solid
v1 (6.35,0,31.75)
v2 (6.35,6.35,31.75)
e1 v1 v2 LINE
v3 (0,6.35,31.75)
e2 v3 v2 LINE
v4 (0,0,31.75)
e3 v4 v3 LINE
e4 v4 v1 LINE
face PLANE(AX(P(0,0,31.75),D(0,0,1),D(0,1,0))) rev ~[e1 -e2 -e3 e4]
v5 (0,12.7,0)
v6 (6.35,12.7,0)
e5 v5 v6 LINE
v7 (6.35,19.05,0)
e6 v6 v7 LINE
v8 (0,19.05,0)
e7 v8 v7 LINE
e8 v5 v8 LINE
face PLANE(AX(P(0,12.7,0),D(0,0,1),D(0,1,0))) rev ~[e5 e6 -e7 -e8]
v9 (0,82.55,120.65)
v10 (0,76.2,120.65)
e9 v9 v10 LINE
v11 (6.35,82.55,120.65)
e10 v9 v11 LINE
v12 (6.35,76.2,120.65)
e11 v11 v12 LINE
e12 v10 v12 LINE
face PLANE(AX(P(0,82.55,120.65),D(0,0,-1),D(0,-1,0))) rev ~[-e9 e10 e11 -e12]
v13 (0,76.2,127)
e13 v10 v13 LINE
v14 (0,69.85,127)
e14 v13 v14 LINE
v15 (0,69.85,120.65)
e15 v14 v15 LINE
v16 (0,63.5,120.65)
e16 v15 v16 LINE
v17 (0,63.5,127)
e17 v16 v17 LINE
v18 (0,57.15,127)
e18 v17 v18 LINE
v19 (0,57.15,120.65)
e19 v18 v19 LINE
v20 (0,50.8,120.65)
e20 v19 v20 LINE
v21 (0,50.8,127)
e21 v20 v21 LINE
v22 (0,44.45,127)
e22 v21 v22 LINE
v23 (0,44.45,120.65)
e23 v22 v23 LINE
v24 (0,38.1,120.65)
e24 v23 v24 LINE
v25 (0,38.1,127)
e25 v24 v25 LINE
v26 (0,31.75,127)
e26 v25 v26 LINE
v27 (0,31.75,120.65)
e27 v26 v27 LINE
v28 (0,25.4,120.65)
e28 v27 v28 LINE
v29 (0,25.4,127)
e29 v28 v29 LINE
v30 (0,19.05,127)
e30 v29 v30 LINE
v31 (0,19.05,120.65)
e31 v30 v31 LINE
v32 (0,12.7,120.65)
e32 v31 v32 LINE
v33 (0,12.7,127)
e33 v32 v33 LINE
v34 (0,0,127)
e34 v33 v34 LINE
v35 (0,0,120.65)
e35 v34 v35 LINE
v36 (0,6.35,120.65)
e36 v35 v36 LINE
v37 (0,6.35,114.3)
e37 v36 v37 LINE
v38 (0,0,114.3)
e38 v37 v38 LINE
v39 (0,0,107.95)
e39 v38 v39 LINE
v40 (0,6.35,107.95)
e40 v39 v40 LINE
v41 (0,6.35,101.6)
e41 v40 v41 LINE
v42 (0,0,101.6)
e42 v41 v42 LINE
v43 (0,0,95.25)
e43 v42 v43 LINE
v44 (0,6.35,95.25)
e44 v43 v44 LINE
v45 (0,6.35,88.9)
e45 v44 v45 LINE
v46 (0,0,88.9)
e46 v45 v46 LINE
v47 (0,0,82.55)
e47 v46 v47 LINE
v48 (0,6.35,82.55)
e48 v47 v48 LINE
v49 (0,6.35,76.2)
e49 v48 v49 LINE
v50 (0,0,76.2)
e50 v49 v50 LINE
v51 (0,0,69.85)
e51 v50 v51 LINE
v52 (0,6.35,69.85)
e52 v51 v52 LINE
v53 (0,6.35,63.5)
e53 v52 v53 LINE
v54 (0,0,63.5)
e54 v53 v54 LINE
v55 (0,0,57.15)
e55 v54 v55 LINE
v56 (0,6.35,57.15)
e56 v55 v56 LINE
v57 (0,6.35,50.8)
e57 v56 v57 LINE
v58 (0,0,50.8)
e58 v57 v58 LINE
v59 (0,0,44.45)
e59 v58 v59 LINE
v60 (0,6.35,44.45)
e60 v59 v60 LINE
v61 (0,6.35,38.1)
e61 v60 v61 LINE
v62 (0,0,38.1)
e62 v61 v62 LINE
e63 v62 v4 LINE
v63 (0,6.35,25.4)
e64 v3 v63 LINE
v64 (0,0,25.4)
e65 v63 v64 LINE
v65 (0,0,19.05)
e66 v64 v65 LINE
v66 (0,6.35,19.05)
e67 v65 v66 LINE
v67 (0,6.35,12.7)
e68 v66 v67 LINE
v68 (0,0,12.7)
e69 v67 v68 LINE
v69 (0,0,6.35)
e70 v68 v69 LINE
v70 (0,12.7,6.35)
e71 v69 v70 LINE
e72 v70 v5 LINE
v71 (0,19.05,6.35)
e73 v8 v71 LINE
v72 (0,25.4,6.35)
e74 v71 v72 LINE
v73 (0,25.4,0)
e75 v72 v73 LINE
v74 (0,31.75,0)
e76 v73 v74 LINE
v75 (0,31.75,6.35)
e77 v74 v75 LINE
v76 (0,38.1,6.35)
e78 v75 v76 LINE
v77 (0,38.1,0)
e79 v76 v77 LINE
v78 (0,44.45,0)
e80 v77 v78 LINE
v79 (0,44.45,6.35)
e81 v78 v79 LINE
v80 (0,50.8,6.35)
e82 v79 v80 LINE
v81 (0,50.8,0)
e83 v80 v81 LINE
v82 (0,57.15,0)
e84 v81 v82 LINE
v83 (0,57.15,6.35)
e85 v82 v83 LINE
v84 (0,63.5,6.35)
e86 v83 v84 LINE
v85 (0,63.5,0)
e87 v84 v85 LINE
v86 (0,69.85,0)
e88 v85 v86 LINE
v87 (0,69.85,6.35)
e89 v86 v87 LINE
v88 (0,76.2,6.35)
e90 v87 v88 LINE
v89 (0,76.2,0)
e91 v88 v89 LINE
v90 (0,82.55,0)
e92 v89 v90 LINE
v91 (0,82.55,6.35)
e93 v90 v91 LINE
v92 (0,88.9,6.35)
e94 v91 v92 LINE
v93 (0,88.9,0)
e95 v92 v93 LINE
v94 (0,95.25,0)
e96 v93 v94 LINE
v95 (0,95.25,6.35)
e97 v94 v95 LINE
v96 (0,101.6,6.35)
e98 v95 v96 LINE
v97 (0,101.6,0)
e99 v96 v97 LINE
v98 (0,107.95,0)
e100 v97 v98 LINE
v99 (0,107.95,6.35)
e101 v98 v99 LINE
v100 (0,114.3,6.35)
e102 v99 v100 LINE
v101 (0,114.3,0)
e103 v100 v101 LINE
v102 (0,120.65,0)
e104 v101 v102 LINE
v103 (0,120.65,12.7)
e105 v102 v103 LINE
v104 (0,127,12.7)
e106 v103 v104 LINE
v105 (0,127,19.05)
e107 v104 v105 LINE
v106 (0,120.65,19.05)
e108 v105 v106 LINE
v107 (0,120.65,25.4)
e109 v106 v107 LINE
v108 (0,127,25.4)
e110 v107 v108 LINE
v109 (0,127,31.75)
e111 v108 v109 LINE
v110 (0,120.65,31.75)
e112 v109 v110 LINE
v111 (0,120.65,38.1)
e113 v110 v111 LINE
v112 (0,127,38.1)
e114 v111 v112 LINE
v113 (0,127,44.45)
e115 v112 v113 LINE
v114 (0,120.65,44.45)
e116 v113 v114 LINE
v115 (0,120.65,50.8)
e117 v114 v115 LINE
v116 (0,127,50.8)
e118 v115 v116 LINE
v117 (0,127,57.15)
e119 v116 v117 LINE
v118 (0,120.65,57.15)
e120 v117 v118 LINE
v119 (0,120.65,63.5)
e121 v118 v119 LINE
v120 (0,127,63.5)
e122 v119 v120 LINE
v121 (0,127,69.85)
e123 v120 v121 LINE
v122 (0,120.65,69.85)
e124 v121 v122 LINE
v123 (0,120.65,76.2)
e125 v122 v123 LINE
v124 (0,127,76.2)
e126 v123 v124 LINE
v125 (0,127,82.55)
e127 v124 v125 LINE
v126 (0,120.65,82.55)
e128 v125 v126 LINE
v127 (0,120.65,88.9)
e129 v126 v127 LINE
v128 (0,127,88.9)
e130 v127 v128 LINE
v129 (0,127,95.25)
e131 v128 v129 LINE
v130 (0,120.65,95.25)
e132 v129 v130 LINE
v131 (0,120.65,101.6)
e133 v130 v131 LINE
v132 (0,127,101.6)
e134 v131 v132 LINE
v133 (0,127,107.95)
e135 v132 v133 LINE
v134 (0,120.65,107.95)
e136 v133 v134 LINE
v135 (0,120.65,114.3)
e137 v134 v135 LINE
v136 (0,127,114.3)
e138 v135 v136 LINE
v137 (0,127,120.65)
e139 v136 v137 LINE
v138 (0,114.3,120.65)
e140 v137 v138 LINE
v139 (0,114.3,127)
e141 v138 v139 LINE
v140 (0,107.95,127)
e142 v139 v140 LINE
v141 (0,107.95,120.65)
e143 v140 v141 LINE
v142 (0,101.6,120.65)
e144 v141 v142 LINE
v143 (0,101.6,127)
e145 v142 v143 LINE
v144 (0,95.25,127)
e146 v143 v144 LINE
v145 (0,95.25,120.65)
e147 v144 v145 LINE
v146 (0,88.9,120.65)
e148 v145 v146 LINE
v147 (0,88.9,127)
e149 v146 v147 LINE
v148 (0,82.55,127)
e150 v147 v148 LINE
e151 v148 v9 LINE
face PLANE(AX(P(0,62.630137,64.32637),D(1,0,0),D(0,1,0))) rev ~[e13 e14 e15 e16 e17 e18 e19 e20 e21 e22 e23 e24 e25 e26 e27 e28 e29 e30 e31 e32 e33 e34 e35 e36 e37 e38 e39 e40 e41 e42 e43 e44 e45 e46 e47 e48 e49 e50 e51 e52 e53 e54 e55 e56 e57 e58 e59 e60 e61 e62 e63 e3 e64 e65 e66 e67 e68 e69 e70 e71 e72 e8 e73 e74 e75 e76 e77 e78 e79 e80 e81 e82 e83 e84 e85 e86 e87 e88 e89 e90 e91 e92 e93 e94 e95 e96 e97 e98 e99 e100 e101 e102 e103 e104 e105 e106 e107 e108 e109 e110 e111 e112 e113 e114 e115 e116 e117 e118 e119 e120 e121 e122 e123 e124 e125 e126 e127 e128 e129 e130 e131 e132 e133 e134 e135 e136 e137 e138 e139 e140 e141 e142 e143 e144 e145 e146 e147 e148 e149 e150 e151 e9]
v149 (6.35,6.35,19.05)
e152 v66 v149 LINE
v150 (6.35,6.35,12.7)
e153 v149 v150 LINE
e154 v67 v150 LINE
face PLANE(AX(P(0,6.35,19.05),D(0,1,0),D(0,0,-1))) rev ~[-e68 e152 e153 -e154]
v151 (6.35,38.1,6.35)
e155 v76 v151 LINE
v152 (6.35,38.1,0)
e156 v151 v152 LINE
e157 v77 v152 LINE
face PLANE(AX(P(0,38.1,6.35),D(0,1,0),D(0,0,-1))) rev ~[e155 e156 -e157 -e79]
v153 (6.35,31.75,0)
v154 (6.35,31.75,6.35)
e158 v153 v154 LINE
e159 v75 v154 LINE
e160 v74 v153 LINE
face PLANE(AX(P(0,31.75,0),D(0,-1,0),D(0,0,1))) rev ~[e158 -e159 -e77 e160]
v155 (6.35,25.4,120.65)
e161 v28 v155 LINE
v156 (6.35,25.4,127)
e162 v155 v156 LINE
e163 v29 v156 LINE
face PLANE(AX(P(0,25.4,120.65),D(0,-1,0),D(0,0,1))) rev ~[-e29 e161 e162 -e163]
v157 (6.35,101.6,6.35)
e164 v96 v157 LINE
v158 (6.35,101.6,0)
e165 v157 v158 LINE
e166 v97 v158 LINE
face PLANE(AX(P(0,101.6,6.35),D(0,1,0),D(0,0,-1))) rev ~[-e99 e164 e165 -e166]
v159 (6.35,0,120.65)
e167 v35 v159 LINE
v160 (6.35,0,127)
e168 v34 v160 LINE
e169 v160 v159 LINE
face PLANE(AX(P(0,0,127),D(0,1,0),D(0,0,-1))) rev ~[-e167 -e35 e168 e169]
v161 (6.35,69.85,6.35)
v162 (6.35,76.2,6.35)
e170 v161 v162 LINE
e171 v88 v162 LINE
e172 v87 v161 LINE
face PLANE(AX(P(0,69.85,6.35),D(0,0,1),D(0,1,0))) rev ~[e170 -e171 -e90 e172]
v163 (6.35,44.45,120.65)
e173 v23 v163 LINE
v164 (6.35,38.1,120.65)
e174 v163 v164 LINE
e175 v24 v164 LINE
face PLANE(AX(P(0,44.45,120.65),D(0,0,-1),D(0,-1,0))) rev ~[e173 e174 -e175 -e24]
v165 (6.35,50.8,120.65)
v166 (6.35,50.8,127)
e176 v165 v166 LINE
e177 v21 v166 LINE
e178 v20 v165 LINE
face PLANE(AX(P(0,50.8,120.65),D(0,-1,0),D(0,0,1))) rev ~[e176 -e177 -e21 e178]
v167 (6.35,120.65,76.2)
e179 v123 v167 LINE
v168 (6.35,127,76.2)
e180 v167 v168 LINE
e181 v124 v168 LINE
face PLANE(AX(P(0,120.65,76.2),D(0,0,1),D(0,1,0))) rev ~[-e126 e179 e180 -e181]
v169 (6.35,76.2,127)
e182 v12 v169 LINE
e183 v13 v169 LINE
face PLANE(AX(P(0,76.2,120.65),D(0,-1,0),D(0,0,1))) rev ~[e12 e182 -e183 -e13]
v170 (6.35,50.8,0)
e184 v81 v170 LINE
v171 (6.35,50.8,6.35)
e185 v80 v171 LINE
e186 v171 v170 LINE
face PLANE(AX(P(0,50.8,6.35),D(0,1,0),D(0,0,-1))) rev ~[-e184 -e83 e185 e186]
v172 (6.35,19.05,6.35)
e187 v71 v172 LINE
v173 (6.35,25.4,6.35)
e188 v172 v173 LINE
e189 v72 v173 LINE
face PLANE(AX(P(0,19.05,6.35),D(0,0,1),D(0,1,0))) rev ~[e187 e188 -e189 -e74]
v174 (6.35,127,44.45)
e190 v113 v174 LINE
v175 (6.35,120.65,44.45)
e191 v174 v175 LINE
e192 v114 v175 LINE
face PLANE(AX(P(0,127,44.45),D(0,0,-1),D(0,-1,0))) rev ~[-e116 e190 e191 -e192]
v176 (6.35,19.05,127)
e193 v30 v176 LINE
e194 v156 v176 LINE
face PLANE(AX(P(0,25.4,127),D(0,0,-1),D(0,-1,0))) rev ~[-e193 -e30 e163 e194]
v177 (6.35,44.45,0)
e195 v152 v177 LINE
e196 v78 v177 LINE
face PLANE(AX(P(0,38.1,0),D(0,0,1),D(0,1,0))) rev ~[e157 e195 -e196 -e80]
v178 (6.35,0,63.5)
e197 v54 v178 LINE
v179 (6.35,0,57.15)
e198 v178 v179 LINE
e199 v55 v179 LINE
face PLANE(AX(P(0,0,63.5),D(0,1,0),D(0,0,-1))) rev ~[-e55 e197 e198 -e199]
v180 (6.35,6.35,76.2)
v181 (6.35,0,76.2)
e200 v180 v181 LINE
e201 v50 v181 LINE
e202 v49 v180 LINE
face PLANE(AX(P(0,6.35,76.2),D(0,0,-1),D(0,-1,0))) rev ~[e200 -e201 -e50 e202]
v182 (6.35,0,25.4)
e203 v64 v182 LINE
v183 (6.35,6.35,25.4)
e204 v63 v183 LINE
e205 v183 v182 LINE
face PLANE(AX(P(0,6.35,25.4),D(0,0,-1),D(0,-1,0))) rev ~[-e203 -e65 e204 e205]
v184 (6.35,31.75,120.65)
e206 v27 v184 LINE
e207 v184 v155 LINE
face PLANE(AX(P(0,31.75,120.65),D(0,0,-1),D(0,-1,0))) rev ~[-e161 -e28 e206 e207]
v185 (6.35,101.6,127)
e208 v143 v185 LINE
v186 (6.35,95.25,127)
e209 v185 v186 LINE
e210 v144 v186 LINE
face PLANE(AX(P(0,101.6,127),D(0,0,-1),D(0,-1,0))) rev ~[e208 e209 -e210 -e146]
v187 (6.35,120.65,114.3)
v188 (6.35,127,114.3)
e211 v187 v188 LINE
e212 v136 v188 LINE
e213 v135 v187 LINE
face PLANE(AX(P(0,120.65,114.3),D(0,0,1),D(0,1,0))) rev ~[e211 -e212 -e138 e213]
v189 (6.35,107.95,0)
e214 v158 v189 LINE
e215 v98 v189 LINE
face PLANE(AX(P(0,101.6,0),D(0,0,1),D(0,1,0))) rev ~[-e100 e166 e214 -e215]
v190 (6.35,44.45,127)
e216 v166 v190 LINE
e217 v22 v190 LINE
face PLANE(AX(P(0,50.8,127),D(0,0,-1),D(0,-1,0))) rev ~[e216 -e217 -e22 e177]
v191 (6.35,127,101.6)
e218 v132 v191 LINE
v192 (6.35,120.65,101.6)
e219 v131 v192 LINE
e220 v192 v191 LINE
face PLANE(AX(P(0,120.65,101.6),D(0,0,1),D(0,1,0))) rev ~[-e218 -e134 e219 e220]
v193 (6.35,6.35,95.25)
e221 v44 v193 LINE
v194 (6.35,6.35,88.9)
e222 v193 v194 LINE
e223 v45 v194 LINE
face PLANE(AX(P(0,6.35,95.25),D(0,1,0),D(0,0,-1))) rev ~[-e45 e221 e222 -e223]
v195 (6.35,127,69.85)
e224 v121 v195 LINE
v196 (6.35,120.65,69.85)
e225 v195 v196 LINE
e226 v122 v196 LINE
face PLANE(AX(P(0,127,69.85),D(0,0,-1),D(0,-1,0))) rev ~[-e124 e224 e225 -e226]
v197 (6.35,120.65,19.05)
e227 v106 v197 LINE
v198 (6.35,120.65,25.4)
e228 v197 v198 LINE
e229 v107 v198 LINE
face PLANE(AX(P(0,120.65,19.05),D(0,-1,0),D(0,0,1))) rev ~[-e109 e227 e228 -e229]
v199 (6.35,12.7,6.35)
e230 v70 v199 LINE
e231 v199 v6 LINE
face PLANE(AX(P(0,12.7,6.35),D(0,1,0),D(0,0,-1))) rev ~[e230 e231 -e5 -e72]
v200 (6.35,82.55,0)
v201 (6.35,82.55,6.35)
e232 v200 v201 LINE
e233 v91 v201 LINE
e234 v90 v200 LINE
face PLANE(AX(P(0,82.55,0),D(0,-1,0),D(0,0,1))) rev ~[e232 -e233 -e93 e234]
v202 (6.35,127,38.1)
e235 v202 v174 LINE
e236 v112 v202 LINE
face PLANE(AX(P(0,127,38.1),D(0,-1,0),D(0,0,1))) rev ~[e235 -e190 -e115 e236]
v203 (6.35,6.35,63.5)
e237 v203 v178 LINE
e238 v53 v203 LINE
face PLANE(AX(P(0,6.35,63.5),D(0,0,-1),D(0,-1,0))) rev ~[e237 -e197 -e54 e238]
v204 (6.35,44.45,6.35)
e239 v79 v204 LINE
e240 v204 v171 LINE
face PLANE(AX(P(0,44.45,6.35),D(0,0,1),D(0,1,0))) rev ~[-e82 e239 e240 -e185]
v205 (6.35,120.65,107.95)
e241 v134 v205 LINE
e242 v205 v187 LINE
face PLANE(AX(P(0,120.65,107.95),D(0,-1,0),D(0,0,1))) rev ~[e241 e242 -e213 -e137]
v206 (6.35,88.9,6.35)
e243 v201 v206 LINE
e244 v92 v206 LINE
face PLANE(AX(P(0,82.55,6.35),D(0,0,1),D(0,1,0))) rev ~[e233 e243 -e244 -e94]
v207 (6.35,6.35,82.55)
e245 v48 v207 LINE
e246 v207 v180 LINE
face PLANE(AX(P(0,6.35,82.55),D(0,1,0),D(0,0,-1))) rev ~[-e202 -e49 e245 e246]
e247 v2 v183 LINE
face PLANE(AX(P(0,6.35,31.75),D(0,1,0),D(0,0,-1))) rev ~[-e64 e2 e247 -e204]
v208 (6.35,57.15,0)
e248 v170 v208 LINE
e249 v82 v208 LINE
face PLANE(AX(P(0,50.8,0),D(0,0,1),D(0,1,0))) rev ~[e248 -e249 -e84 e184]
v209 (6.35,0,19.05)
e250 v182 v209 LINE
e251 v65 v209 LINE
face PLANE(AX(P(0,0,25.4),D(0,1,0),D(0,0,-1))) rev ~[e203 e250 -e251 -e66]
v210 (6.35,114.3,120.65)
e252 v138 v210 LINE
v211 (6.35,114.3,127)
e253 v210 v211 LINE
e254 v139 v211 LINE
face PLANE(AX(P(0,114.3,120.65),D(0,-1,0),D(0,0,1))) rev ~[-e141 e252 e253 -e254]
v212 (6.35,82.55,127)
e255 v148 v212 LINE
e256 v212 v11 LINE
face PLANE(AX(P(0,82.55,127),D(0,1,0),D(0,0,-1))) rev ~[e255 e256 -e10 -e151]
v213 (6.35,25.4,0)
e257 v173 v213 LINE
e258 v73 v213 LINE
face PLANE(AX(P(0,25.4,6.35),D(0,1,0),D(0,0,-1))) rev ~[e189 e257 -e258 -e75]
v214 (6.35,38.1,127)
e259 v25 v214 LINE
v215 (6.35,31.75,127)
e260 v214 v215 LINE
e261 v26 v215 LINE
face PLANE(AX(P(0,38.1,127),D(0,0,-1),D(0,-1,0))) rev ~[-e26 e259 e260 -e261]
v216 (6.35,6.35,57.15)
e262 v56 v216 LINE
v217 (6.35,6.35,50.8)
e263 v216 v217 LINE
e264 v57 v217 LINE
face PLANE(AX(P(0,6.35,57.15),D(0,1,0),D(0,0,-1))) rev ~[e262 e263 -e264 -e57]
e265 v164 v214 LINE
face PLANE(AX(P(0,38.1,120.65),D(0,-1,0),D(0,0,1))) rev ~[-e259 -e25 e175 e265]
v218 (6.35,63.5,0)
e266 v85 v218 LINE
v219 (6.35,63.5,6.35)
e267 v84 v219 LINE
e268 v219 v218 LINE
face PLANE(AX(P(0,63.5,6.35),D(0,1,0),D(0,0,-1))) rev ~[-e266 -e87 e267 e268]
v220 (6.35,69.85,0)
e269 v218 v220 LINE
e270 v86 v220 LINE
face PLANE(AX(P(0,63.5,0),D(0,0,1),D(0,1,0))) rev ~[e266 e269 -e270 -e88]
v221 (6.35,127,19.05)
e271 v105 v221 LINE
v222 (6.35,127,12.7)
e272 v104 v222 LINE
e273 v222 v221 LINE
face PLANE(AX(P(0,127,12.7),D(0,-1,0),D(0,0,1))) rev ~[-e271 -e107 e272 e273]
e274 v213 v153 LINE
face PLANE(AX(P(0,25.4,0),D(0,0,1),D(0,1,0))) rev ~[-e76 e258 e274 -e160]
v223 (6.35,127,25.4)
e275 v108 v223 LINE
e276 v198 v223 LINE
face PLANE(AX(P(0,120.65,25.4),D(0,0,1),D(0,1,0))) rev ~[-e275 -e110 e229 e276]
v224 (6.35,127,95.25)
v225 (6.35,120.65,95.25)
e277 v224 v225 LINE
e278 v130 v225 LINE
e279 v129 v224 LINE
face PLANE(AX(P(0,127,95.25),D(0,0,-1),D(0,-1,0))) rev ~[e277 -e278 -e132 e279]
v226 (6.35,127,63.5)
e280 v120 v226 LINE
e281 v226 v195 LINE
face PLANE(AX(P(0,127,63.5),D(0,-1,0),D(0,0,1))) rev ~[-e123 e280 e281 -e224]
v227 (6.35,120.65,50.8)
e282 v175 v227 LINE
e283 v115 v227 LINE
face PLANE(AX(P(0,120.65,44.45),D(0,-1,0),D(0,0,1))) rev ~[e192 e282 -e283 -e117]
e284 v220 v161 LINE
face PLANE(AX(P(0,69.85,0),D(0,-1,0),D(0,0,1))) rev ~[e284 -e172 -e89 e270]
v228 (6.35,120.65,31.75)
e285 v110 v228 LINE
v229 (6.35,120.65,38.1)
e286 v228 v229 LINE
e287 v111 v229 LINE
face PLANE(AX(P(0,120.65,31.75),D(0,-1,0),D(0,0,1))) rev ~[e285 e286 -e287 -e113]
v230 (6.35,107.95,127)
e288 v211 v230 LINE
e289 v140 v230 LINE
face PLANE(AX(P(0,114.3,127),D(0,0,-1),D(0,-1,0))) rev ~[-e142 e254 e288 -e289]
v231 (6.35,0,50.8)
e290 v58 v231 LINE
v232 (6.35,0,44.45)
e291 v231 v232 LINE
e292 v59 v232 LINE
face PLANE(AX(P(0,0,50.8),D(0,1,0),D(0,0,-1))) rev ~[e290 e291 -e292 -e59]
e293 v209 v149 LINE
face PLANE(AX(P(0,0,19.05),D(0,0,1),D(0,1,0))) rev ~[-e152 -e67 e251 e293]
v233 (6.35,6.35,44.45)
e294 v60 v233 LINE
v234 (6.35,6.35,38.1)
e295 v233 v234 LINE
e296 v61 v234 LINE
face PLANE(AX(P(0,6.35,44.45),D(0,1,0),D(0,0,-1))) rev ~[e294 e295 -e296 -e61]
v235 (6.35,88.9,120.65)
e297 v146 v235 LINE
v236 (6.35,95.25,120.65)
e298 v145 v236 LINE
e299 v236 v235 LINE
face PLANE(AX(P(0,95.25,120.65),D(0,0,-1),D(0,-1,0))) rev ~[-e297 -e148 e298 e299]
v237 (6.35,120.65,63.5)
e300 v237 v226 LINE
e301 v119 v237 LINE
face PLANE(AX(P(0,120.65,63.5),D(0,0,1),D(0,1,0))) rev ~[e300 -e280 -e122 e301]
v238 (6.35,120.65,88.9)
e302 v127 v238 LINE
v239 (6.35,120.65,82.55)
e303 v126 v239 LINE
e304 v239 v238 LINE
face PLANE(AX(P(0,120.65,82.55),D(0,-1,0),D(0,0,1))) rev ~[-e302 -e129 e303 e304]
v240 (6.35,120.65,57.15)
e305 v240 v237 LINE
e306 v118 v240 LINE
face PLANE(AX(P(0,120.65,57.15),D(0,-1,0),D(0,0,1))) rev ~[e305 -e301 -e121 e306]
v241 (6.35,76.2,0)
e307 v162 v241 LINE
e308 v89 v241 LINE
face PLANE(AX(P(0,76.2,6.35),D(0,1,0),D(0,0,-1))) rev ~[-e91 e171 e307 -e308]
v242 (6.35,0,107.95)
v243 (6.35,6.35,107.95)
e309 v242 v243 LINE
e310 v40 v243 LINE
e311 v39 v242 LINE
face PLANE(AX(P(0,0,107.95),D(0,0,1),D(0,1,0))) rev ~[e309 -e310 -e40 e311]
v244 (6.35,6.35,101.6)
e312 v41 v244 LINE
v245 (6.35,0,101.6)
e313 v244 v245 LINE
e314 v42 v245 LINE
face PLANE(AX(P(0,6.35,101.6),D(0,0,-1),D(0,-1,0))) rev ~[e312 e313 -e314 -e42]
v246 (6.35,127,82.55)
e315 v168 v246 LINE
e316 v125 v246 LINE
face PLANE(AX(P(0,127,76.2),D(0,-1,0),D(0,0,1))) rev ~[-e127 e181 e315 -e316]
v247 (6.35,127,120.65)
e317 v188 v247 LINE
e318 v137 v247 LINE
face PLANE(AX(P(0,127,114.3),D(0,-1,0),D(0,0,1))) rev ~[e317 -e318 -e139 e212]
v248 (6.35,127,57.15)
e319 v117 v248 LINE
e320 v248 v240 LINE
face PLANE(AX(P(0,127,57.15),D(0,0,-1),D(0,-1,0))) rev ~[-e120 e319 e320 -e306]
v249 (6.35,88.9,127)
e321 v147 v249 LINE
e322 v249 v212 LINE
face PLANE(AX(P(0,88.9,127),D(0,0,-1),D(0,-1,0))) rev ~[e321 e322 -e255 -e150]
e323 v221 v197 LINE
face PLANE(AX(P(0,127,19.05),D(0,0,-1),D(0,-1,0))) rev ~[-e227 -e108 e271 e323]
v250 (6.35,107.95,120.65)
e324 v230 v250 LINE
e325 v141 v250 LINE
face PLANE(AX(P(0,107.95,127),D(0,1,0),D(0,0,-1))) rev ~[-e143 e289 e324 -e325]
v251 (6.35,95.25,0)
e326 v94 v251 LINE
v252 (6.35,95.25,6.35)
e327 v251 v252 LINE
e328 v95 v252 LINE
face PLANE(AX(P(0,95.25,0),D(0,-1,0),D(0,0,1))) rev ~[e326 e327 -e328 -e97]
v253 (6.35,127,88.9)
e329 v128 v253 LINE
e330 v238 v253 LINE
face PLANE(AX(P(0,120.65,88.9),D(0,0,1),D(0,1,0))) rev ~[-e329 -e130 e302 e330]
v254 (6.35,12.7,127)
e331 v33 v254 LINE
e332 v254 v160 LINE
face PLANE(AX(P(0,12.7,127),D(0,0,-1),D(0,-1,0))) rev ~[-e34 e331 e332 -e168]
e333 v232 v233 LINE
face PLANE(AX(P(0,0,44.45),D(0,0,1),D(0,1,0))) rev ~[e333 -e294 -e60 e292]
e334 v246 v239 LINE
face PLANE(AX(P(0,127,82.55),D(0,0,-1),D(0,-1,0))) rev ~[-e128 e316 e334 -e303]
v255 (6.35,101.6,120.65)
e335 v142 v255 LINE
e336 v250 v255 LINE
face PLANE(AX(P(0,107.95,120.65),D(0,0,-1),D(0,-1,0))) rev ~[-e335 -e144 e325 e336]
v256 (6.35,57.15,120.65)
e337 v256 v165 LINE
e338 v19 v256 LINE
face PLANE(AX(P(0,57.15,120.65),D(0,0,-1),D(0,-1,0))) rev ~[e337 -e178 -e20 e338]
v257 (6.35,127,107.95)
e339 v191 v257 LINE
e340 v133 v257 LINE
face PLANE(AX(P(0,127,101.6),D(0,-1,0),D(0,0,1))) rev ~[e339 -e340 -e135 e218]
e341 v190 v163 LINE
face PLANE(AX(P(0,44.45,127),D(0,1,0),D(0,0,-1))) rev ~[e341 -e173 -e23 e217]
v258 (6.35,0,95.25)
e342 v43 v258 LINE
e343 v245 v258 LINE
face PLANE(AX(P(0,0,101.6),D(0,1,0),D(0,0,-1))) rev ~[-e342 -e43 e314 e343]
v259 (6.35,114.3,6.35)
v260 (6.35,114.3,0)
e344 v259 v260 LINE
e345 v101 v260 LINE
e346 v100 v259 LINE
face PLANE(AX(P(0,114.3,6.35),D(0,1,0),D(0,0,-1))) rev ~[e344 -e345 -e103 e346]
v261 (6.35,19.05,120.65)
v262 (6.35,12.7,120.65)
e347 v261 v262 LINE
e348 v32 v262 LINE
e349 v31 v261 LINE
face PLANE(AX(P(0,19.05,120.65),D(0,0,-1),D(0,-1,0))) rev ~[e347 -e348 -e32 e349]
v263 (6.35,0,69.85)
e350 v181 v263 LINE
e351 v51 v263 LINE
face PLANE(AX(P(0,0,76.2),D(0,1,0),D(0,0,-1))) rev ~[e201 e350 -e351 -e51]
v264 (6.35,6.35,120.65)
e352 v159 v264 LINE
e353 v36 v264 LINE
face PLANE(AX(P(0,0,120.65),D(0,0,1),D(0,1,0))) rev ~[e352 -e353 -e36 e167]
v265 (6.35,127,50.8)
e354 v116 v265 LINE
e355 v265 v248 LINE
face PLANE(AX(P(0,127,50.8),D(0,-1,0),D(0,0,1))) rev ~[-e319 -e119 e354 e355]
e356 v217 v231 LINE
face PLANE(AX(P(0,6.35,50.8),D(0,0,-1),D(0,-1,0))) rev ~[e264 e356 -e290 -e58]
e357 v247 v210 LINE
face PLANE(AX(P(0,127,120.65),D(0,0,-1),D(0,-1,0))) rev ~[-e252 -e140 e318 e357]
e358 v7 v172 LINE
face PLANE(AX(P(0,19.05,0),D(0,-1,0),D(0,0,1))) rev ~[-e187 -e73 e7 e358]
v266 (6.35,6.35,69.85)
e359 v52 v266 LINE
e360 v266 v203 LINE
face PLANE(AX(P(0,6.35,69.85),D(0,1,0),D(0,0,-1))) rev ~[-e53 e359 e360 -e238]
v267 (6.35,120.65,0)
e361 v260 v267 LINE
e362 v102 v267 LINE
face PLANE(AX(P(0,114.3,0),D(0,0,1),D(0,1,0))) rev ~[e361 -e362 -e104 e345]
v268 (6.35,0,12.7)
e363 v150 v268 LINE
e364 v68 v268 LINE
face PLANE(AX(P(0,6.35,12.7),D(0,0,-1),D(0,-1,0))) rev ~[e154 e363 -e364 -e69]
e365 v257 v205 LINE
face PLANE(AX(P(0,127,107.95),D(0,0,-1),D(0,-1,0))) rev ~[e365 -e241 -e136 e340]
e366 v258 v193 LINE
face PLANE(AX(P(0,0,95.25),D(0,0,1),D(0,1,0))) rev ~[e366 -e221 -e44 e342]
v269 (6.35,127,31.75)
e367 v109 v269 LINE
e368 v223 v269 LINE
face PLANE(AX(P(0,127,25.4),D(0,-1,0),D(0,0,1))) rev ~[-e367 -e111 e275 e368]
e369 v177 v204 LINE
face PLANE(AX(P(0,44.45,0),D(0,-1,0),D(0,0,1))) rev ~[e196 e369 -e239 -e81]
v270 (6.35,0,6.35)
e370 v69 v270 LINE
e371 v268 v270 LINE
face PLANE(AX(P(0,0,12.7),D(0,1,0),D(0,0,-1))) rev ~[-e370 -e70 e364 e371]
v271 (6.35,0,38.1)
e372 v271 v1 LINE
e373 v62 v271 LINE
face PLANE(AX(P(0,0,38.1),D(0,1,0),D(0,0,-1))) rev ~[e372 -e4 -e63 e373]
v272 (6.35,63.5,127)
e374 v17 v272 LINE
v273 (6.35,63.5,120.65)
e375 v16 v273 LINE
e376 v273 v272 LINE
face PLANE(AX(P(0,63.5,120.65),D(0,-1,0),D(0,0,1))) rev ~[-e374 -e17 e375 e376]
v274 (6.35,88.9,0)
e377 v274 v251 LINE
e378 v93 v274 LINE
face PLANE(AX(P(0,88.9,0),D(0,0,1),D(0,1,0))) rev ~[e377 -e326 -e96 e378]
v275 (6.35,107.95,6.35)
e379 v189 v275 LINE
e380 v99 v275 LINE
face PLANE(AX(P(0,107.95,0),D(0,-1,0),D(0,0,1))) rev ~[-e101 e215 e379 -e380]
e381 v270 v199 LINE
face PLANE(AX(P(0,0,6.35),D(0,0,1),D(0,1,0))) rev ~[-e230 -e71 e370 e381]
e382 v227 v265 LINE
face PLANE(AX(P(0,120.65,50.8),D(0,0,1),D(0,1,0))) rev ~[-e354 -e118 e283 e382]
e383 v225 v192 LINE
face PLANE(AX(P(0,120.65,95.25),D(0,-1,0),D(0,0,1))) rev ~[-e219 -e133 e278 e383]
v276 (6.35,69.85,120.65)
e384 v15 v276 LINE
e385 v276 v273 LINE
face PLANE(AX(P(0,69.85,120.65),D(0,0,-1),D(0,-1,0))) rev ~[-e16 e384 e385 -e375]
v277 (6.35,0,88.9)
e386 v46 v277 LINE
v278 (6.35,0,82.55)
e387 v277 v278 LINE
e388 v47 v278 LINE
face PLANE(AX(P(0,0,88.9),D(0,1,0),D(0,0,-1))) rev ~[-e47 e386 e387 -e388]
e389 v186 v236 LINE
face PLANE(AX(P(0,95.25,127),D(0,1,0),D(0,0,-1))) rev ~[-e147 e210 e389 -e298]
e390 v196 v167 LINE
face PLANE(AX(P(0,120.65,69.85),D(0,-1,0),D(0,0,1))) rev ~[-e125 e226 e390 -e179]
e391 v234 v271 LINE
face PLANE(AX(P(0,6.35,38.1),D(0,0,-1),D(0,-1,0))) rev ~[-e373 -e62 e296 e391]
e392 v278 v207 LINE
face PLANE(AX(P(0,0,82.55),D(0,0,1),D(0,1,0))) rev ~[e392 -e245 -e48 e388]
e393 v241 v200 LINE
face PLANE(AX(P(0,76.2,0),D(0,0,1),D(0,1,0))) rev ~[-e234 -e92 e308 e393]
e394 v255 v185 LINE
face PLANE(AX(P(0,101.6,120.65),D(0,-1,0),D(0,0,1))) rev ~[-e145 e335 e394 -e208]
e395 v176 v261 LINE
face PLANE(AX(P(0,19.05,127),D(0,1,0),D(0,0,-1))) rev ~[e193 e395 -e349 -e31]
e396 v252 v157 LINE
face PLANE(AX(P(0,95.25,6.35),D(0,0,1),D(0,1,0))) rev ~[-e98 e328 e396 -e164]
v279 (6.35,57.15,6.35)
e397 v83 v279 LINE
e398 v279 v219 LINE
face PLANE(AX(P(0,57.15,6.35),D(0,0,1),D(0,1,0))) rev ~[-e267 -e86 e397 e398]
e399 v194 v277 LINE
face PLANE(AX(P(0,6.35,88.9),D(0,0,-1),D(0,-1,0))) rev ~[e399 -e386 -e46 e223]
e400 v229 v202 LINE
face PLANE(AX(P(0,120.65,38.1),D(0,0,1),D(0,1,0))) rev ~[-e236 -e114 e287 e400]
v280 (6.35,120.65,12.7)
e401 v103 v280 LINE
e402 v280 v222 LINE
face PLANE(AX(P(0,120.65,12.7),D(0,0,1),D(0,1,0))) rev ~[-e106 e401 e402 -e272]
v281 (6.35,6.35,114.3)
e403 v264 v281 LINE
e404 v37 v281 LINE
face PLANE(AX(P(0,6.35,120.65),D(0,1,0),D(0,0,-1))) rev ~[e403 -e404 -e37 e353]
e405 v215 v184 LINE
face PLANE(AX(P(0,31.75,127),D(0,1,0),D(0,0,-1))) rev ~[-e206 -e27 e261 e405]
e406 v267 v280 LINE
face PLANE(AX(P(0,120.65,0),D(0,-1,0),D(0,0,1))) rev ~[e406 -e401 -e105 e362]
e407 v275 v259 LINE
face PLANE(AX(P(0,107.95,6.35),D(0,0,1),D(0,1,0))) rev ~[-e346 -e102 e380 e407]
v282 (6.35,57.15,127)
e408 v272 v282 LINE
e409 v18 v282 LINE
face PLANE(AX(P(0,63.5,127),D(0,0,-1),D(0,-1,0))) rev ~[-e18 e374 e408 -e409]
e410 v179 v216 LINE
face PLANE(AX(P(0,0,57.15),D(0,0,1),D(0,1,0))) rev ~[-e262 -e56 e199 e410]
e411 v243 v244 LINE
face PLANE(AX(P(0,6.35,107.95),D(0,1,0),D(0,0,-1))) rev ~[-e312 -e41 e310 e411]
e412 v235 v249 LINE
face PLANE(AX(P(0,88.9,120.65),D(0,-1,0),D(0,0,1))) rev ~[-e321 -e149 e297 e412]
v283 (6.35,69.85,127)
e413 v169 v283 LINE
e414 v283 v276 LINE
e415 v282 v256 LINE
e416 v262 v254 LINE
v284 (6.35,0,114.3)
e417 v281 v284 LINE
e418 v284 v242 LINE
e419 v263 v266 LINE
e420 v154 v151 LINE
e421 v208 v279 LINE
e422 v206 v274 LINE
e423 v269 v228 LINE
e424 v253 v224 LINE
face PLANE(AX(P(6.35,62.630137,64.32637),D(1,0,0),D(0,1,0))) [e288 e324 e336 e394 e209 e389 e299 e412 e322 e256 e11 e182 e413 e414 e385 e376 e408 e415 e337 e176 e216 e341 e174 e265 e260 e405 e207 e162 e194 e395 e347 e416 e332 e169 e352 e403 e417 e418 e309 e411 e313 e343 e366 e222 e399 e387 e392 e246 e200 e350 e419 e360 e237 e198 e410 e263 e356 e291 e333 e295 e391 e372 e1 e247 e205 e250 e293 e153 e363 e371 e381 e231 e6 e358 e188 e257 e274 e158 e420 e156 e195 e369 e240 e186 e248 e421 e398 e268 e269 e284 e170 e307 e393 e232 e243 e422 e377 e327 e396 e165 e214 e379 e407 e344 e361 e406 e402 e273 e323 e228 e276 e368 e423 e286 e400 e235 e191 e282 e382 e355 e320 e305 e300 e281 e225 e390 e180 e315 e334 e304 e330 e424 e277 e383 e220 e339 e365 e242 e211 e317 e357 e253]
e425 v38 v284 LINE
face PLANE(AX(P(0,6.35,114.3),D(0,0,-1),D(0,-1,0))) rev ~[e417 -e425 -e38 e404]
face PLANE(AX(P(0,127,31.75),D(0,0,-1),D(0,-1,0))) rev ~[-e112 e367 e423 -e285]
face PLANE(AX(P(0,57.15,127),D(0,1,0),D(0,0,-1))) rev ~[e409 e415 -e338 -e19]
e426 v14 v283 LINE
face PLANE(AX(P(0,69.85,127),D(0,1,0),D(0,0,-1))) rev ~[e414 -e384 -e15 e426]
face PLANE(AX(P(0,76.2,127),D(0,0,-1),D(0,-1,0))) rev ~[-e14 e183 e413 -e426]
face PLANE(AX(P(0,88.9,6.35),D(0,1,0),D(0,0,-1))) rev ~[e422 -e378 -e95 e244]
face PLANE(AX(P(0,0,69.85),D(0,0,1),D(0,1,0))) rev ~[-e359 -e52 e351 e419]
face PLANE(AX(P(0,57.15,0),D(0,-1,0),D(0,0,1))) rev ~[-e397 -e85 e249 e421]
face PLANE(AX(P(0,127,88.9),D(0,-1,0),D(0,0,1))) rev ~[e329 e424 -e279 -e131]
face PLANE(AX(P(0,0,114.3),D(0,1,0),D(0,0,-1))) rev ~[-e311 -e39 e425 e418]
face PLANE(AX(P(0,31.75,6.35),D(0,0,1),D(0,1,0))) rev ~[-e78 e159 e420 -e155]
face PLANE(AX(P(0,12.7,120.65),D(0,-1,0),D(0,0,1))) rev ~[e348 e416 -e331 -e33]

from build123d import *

# Parameters (mm, degrees)
F1_DEPTH = 6.35


# Not quite as in the source:
# - a feature names something its author has since deleted; it is built from what else it names


with BuildPart() as f1:
    # F0 (on Right) → F1 (new body)
    with BuildSketch(Plane.YZ):
        Polygon((12.7, 127), (6.35, 127), (0, 127), (0, 120.65), (6.35, 120.65), (6.35, 114.3), (0, 114.3), (0, 107.95), (6.35, 107.95), (6.35, 101.6), (0, 101.6), (0, 95.25), (6.35, 95.25), (6.35, 88.9), (0, 88.9), (0, 82.55), (6.35, 82.55), (6.35, 76.2), (0, 76.2), (0, 69.85), (6.35, 69.85), (6.35, 63.5), (0, 63.5), (0, 57.15), (6.35, 57.15), (6.35, 50.8), (0, 50.8), (0, 44.45), (6.35, 44.45), (6.35, 38.1), (0, 38.1), (0, 31.75), (6.35, 31.75), (6.35, 25.4), (0, 25.4), (0, 19.05), (6.35, 19.05), (6.35, 12.7), (0, 12.7), (0, 6.35), (6.35, 6.35), (12.7, 6.35), (12.7, 0), (19.05, 0), (19.05, 6.35), (25.4, 6.35), (25.4, 0), (31.75, 0), (31.75, 6.35), (38.1, 6.35), (38.1, 0), (44.45, 0), (44.45, 6.35), (50.8, 6.35), (50.8, 0), (57.15, 0), (57.15, 6.35), (63.5, 6.35), (63.5, 0), (69.85, 0), (69.85, 6.35), (76.2, 6.35), (76.2, 0), (82.55, 0), (82.55, 6.35), (88.9, 6.35), (88.9, 0), (95.25, 0), (95.25, 6.35), (101.6, 6.35), (101.6, 0), (107.95, 0), (107.95, 6.35), (114.3, 6.35), (114.3, 0), (120.65, 0), (120.65, 6.35), (120.65, 12.7), (127, 12.7), (127, 19.05), (120.65, 19.05), (120.65, 25.4), (127, 25.4), (127, 31.75), (120.65, 31.75), (120.65, 38.1), (127, 38.1), (127, 44.45), (120.65, 44.45), (120.65, 50.8), (127, 50.8), (127, 57.15), (120.65, 57.15), (120.65, 63.5), (127, 63.5), (127, 69.85), (120.65, 69.85), (120.65, 76.2), (127, 76.2), (127, 82.55), (120.65, 82.55), (120.65, 88.9), (127, 88.9), (127, 95.25), (120.65, 95.25), (120.65, 101.6), (127, 101.6), (127, 107.95), (120.65, 107.95), (120.65, 114.3), (127, 114.3), (127, 120.65), (120.65, 120.65), (114.3, 120.65), (114.3, 127), (107.95, 127), (107.95, 120.65), (101.6, 120.65), (101.6, 127), (95.25, 127), (95.25, 120.65), (88.9, 120.65), (88.9, 127), (82.55, 127), (82.55, 120.65), (76.2, 120.65), (76.2, 127), (69.85, 127), (69.85, 120.65), (63.5, 120.65), (63.5, 127), (57.15, 127), (57.15, 120.65), (50.8, 120.65), (50.8, 127), (44.45, 127), (44.45, 120.65), (38.1, 120.65), (38.1, 127), (31.75, 127), (31.75, 120.65), (25.4, 120.65), (25.4, 127), (19.05, 127), (19.05, 120.65), (12.7, 120.65), align=None)
    extrude(amount=F1_DEPTH)


solid = f1.part
